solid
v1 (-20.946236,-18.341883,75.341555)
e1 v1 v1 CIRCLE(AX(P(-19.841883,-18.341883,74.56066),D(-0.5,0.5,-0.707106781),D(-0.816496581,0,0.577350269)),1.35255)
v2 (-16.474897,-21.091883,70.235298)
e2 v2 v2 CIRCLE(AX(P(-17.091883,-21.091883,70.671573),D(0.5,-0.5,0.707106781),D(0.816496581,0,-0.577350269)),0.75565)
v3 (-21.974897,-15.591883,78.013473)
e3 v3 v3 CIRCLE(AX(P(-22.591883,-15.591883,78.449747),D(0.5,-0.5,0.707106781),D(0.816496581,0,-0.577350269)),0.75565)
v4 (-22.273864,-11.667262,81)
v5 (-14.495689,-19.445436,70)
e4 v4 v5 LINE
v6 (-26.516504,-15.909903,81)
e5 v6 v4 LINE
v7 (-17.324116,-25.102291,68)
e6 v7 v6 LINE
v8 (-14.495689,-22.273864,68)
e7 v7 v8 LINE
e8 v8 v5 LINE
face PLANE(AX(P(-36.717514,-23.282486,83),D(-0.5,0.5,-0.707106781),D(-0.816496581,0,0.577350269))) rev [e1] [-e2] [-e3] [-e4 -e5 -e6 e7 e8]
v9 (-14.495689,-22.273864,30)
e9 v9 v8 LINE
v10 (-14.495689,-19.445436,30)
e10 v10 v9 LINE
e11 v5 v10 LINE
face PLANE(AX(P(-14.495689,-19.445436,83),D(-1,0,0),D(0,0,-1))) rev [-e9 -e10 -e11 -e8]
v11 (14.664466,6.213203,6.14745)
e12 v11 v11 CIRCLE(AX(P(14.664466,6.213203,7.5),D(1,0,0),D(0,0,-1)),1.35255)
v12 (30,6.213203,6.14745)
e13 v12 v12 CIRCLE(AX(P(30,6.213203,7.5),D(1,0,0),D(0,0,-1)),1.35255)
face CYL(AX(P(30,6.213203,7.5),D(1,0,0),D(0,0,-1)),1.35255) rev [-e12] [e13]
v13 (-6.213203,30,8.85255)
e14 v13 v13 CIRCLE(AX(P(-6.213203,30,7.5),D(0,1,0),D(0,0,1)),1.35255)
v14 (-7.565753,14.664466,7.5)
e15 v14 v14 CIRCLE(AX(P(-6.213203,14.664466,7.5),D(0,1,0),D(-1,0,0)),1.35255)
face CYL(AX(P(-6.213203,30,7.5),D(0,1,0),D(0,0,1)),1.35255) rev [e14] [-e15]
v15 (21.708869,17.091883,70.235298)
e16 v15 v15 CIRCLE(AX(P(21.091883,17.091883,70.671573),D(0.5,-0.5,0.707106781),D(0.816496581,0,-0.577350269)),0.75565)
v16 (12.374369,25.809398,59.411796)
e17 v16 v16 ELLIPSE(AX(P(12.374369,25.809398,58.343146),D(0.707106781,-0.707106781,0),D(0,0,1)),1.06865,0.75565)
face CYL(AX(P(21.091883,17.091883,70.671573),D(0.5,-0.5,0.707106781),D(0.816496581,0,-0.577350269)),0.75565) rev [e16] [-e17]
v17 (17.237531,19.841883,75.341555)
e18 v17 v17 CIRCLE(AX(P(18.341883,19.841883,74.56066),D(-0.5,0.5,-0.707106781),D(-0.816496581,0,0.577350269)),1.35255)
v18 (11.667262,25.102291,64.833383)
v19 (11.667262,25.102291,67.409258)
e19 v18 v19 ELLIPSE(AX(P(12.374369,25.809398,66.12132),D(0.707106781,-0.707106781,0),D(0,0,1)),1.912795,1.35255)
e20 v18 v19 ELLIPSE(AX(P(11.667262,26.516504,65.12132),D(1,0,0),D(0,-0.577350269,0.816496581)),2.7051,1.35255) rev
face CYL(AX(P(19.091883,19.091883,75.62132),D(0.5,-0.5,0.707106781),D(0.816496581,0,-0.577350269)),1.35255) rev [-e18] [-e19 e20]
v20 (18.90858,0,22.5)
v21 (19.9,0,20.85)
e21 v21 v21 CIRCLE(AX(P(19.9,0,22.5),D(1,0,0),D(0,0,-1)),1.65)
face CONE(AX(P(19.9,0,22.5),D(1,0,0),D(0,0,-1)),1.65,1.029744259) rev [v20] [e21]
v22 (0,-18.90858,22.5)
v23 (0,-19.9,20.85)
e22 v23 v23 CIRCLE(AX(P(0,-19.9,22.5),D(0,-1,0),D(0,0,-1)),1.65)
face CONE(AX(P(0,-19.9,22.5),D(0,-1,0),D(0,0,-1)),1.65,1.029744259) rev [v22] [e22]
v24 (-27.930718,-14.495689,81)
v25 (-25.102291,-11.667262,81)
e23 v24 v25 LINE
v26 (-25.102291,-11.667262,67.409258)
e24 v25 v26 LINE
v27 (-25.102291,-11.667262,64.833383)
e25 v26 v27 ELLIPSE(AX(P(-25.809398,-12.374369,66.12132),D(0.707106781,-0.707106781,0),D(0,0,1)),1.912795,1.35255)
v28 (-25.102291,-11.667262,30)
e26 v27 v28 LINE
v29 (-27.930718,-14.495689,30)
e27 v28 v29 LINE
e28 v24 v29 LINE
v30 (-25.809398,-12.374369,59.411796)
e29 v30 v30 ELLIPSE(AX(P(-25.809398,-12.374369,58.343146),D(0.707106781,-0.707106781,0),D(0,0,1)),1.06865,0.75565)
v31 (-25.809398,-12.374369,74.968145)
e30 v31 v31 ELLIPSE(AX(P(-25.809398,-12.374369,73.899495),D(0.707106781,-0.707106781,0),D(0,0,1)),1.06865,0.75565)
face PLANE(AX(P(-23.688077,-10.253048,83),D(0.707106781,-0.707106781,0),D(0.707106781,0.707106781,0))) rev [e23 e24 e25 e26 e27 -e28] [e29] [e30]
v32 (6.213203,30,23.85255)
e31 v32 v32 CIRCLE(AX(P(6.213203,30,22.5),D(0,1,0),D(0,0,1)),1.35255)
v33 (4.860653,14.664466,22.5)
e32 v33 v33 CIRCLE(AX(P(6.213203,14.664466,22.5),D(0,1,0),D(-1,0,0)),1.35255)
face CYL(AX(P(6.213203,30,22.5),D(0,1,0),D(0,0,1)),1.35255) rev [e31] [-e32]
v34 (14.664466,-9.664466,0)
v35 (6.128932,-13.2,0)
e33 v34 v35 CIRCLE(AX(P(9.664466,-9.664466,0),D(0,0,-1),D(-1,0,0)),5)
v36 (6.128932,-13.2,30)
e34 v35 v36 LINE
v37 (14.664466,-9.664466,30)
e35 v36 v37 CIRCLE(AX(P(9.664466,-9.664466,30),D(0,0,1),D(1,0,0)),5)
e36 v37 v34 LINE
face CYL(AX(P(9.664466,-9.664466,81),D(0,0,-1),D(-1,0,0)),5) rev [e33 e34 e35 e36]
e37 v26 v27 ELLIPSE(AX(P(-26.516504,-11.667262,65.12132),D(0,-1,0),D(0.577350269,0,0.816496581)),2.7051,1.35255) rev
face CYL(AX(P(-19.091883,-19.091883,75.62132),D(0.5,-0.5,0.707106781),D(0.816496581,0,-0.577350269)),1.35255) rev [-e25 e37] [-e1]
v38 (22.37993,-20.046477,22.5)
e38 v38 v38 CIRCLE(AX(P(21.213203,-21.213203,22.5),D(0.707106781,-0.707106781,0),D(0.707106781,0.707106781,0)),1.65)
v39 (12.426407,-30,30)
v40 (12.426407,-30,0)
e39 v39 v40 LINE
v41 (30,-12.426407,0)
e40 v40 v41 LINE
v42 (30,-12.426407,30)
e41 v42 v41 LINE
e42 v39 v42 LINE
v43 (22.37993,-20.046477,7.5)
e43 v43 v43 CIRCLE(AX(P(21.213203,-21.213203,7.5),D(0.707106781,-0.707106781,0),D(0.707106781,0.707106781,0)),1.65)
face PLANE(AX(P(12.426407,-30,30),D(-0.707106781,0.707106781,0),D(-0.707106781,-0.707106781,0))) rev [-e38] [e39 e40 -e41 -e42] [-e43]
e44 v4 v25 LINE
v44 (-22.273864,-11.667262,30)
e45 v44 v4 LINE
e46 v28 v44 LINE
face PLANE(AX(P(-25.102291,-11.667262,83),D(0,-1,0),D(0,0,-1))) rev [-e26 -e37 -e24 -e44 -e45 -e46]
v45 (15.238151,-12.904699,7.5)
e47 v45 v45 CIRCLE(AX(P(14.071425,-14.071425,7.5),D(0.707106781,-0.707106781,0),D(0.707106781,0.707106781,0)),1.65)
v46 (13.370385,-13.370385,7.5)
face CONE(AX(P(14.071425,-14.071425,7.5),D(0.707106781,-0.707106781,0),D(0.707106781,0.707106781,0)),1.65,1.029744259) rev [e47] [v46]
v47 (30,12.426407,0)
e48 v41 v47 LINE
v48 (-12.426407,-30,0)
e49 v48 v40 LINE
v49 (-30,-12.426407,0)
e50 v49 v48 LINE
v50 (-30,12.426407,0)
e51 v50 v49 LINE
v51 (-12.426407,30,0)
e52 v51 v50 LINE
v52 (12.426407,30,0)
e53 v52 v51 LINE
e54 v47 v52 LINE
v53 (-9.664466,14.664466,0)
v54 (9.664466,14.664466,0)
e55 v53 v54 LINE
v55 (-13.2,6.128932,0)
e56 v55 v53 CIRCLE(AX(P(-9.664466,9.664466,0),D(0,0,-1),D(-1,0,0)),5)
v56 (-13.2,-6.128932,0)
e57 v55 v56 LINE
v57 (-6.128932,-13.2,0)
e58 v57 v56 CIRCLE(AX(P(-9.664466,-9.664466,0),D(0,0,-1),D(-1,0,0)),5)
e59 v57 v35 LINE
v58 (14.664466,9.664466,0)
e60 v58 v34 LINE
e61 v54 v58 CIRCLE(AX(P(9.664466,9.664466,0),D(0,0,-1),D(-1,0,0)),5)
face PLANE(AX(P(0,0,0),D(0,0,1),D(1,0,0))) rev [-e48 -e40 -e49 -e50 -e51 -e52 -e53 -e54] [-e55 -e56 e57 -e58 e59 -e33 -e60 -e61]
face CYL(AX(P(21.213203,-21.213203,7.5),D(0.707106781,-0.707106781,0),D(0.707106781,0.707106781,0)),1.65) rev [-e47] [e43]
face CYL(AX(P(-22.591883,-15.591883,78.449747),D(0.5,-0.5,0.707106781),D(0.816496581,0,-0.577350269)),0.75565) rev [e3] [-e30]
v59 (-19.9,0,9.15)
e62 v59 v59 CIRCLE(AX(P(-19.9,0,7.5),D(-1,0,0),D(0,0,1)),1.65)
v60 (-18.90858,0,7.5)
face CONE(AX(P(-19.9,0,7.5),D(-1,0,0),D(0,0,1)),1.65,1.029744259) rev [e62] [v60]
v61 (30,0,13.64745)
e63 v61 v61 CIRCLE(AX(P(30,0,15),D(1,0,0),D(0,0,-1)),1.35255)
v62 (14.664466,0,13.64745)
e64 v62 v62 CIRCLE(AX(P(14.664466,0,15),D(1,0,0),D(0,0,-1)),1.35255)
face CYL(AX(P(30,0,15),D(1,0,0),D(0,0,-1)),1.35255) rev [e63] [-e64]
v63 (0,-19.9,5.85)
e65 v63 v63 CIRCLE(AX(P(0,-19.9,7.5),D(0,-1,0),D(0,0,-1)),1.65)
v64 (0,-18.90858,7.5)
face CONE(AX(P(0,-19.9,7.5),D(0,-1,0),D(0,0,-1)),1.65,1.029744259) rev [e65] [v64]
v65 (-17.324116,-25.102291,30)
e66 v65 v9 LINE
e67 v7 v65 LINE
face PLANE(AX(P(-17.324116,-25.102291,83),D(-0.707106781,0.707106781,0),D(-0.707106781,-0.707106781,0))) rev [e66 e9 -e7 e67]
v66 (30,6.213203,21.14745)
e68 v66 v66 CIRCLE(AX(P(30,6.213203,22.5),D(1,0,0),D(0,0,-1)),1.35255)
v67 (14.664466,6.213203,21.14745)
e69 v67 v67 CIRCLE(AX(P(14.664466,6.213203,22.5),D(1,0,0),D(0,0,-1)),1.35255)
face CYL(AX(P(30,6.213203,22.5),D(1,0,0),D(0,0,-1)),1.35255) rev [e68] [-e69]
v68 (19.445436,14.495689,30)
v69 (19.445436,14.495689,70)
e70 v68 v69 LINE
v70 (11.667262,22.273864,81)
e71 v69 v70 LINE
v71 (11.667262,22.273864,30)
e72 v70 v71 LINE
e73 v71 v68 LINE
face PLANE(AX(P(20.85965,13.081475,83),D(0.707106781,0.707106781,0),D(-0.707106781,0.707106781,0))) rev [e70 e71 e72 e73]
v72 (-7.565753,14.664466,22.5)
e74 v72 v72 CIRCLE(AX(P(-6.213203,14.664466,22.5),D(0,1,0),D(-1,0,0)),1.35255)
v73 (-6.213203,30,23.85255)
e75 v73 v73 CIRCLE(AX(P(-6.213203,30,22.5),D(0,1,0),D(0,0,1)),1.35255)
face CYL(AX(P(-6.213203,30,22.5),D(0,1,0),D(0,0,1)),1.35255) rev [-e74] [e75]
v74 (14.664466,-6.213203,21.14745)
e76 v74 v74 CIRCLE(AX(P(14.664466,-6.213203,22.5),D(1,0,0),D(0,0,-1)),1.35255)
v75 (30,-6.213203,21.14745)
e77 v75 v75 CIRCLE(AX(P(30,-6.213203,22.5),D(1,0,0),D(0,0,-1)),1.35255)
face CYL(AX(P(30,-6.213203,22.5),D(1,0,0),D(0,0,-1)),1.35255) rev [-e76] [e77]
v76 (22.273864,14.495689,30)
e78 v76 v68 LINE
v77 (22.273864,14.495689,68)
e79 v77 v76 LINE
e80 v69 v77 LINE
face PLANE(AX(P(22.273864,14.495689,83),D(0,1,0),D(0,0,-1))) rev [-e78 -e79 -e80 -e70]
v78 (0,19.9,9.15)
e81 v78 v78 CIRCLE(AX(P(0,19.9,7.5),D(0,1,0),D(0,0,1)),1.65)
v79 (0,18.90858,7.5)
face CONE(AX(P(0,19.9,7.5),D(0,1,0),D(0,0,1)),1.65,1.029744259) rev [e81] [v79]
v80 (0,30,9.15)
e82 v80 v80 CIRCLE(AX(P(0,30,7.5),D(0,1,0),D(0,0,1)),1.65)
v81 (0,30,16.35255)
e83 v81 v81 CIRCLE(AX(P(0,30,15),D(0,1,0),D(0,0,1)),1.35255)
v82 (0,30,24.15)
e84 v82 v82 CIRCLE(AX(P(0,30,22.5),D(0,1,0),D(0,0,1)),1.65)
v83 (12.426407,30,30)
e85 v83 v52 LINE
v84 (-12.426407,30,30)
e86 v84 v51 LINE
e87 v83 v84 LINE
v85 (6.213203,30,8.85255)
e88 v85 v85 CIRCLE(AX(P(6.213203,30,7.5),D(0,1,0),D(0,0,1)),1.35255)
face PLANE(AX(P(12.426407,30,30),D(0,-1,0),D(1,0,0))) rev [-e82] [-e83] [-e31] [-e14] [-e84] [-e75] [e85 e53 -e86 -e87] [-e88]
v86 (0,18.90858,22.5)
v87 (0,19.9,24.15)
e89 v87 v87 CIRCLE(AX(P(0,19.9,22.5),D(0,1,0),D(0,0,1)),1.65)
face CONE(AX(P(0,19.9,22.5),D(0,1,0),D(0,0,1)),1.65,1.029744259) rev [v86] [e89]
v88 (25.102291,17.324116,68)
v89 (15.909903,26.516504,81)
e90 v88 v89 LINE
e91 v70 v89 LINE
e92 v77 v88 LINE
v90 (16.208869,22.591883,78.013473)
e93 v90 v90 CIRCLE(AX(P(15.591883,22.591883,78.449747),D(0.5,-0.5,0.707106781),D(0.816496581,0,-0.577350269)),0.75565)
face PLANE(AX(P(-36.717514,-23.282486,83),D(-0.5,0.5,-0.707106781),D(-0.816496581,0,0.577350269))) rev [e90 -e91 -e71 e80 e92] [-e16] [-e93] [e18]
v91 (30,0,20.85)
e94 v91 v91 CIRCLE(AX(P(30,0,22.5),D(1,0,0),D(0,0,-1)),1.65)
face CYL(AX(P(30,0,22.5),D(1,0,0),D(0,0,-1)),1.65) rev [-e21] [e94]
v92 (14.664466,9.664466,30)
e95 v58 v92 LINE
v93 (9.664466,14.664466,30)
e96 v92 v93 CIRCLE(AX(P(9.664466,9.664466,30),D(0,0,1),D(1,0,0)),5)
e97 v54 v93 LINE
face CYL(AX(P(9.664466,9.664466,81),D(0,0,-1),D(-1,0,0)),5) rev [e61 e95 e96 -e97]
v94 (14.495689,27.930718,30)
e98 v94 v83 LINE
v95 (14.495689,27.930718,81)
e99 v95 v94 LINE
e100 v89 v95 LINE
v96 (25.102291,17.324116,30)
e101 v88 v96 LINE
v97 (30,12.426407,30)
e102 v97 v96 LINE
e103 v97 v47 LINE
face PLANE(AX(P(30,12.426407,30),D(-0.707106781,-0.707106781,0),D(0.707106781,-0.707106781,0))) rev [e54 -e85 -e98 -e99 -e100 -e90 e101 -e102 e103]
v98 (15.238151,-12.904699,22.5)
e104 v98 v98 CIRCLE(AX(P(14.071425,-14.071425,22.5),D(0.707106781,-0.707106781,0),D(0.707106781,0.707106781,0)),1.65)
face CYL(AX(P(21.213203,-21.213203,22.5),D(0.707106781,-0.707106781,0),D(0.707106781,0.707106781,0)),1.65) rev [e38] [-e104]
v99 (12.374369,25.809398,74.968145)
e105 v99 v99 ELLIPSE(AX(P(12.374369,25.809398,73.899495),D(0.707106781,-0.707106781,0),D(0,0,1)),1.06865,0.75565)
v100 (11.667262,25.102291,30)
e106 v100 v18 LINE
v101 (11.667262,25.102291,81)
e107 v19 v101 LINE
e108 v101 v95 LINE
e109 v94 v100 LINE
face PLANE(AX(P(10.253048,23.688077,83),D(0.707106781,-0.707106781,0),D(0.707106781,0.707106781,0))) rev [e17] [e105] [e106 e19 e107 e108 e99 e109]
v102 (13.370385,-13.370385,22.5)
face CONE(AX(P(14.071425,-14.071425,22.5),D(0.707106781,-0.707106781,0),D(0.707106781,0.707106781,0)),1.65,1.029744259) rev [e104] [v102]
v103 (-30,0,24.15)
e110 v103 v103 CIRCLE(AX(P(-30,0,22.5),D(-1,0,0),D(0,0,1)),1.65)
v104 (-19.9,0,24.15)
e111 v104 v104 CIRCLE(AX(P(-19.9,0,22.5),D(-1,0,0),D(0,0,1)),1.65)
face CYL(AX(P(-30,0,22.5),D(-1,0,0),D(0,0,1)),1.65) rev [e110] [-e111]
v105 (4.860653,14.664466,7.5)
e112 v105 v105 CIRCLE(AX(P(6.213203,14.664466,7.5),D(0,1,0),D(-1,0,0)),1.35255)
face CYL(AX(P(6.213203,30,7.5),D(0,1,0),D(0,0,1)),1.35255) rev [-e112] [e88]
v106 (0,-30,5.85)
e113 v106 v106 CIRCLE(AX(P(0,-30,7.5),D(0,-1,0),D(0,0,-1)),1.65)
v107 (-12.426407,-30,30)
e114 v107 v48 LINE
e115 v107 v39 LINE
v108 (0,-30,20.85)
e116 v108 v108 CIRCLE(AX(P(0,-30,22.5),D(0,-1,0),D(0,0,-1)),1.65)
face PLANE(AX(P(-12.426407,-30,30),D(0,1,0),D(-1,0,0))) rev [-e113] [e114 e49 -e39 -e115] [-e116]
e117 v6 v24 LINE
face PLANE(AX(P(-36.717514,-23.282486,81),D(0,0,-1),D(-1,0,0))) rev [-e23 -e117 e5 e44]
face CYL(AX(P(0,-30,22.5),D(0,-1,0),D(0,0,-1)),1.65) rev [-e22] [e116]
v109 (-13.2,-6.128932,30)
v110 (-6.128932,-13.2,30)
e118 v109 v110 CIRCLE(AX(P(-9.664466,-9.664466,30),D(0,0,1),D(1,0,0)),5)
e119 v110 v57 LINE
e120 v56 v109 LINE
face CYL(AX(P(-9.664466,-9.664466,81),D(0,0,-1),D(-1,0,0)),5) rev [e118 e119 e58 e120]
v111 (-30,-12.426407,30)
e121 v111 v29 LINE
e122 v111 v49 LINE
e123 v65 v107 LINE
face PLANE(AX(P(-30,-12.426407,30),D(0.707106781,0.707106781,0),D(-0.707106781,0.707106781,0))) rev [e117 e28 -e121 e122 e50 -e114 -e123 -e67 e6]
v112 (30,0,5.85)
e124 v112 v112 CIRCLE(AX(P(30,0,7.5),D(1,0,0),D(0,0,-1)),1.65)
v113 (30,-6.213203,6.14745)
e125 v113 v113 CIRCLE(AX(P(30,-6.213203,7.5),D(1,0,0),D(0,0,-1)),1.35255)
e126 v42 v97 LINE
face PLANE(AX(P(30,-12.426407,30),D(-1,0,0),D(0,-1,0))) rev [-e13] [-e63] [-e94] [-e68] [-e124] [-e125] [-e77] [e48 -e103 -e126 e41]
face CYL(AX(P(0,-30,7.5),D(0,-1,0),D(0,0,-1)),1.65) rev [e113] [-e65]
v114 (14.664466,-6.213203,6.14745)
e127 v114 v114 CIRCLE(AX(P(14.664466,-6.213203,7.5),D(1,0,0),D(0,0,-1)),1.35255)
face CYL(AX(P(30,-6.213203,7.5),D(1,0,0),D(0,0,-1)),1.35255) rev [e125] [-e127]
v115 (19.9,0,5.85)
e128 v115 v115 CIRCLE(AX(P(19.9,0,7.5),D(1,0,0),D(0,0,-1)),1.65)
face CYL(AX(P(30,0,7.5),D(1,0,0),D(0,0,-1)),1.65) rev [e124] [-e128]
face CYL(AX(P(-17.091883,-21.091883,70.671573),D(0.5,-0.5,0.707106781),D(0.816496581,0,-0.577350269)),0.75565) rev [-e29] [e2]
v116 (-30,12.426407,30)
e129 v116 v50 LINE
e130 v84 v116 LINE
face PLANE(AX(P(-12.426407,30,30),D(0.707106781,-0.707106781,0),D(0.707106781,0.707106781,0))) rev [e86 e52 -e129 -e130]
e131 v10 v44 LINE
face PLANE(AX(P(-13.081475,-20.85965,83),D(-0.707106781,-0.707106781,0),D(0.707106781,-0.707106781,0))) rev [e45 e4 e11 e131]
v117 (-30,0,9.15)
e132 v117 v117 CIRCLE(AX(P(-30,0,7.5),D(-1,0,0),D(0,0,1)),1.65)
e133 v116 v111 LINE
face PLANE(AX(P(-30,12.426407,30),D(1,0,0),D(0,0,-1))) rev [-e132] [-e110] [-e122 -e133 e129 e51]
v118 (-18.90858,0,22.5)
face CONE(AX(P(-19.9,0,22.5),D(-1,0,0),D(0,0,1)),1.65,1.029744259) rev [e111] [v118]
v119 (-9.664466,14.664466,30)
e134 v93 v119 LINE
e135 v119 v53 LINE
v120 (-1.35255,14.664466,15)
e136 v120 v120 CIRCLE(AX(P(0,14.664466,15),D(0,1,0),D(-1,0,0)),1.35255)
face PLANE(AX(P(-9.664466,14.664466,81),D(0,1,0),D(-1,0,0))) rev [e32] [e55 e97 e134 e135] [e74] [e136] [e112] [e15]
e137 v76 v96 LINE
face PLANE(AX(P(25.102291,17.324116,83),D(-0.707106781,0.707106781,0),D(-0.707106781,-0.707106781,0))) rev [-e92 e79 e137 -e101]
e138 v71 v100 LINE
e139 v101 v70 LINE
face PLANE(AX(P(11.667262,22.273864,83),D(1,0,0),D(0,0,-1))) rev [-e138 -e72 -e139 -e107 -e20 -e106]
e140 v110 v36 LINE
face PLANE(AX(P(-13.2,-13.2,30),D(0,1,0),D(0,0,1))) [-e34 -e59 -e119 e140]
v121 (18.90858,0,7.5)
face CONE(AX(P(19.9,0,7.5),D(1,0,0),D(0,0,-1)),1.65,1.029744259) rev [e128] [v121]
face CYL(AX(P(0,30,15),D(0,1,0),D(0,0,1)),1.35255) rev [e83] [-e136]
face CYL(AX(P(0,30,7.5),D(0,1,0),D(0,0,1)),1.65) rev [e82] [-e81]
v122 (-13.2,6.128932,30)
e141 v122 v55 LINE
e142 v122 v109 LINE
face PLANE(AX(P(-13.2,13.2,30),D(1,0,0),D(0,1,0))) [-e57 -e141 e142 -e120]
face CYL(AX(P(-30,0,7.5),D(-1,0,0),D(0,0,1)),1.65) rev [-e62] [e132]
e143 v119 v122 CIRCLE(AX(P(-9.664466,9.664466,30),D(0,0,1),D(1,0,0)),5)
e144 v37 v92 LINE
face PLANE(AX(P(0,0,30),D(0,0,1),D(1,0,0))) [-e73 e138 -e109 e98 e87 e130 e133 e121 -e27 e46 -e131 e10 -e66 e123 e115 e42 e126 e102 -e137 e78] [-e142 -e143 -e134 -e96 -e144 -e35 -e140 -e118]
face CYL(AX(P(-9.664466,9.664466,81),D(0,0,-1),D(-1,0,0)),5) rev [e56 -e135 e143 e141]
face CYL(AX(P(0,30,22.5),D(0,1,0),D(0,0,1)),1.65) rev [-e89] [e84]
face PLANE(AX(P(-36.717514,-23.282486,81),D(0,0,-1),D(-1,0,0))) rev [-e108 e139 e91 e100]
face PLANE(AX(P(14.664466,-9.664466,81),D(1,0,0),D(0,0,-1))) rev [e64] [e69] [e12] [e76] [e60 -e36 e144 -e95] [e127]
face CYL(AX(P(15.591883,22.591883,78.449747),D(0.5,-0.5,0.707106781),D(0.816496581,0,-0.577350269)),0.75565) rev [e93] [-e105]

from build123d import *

# Parameters (mm, degrees)
SKETCH1_W                 = 26.4
SKETCH1_H                 = 26.4
BOSS_EXTRUDE1_DEPTH       = 30
BOSS_EXTRUDE2_DEPTH       = 53
CUT_EXTRUDE1_DEPTH        = 111.157089705
F_6_32_TAPPED_HOLE1_D     = 2.7051
F_1_72_TAPPED_HOLE1_D     = 1.5113
CHAMFER1_SIZE             = 2
M4X0_7_TAPPED_HOLE1_D     = 3.3
M4X0_7_TAPPED_HOLE1_DEPTH = 10.1
M4X0_7_TAPPED_HOLE1_TIP   = 0.991420021
M4X0_7_TAPPED_HOLE2_D     = 3.3
M4X0_7_TAPPED_HOLE2_DEPTH = 10.1
M4X0_7_TAPPED_HOLE2_TIP   = 0.991420021
M4X0_7_TAPPED_HOLE3_D     = 3.3
M4X0_7_TAPPED_HOLE3_DEPTH = 10.1
M4X0_7_TAPPED_HOLE3_TIP   = 0.991420021
CUT_EXTRUDE2_DEPTH        = 111.157089705
M4X0_7_TAPPED_HOLE4_D     = 3.3
M4X0_7_TAPPED_HOLE4_DEPTH = 10.1
M4X0_7_TAPPED_HOLE4_TIP   = 0.991420021
SKETCH24_R                = 5
CUT_EXTRUDE3_DEPTH        = 92.438503925
SKETCH25_W                = 19.328932188
SKETCH25_H                = 1.464466094
SKETCH25_W_2              = 1.464466094
SKETCH25_H_2              = 19.328932188
CUT_EXTRUDE4_DEPTH        = 92.438503925
F_6_32_TAPPED_HOLE2_D     = 2.7051
F_6_32_TAPPED_HOLE2_DEPTH = 15.335533906
F_6_32_TAPPED_HOLE3_D     = 2.7051
F_6_32_TAPPED_HOLE3_DEPTH = 15.335533906
M4X0_7_TAPPED_HOLE6_D     = 3.3
M4X0_7_TAPPED_HOLE6_DEPTH = 10.1
M4X0_7_TAPPED_HOLE6_TIP   = 0.991420021


with BuildPart() as part:
    # Sketch1 → Boss-Extrude1 (new body)
    with BuildSketch(Plane.XY):
        Polygon((-12.426406871, -30), (12.426406871, -30), (30, -12.426406871), (30, 12.426406871), (12.426406871, 30), (-12.426406871, 30), (-30, 12.426406871), (-30, -12.426406871), align=None)
        Rectangle(SKETCH1_W, SKETCH1_H, mode=Mode.SUBTRACT)
    extrude(amount=BOSS_EXTRUDE1_DEPTH)

    # Sketch2 → Boss-Extrude2 (add)
    with BuildSketch(Plane.XY.offset(30)):
        Polygon((14.495689014, 27.930717857), (25.102290732, 17.324116139), (20.859650045, 13.081475452), (10.253048327, 23.68807717), align=None)
        Polygon((-27.930717857, -14.495689014), (-17.324116139, -25.102290732), (-13.081475452, -20.859650045), (-23.68807717, -10.253048327), align=None)
    extrude(amount=BOSS_EXTRUDE2_DEPTH)

    # Sketch3 → Cut-Extrude1 (cut, through all)
    with BuildSketch(Plane(origin=(21.213203436, 21.213203436, 0), x_dir=(0, 0, -1), z_dir=(0.7071067811865475, 0.7071067811865477, 0))):
        Polygon((-83, 9.5), (-83, -5.5), (-68, -5.5), align=None)
    extrude(amount=-CUT_EXTRUDE1_DEPTH, mode=Mode.SUBTRACT)

    # #6-32 Tapped Hole1 (through all)
    with Locations(Plane(origin=(26.736174209, -26.736174209, 37.810660172), x_dir=(0.8660254037844379, 0.2886751345948145, -0.40824829046386363), z_dir=(0.5000000000000013, -0.5000000000000009, 0.7071067811865459))):
        with Locations((-8.826867068, 59.248446925), (-52.917682438, 28.071532389)):
            Hole(F_6_32_TAPPED_HOLE1_D / 2)

    # #1-72 Tapped Hole1 (through all)
    with Locations(Plane(origin=(25.986174209, -25.986174209, 36.75), x_dir=(0.8660254037844379, 0.2886751345948144, -0.40824829046386346), z_dir=(0.5000000000000012, -0.5000000000000009, 0.707106781186546))):
        with Locations((-12.002293548, 63.73917812), (-5.651440587, 54.75771573), (-56.093108918, 32.562263584), (-49.742255957, 23.580801194)):
            Hole(F_1_72_TAPPED_HOLE1_D / 2)

    # Chamfer1
    # the kernel refuses this chamfer: 2 mm, written as the material it takes off along each edge
    with BuildSketch(Plane(origin=(10.253048327, 23.68807717, 30), x_dir=(0.6873969152646597, 0.7262819568766873, 0), z_dir=(0, 0, 1))) as chamfer1_piece_1:
        Polygon((CHAMFER1_SIZE * 0.999621916911, -CHAMFER1_SIZE * 0.0274958766106), (-CHAMFER1_SIZE * 0.0274958766106, -CHAMFER1_SIZE * 0.999621916911), (0, 0), align=None)
    extrude(amount=58.143365976, mode=Mode.SUBTRACT)
    with BuildSketch(Plane(origin=(20.859650045, 13.081475452, 30), x_dir=(-0.7262819568766877, 0.6873969152646593, 0), z_dir=(0, 0, 1)), Plane(origin=(-13.081475452, -20.859650045, 30), x_dir=(-0.6873969152646596, -0.7262819568766873, 0), z_dir=(0, 0, 1))) as chamfer1_piece_2:
        Polygon((CHAMFER1_SIZE * 0.999621916911, -CHAMFER1_SIZE * 0.0274958766106), (-CHAMFER1_SIZE * 0.0274958766106, -CHAMFER1_SIZE * 0.999621916911), (0, 0), align=None)
    extrude(amount=43.143365976, mode=Mode.SUBTRACT)
    with BuildSketch(Plane(origin=(-23.68807717, -10.253048327, 30), x_dir=(-0.7262819568766861, -0.6873969152646611, 0), z_dir=(0, 0, 1))) as chamfer1_piece_3:
        Polygon((CHAMFER1_SIZE * 0.999621916911, CHAMFER1_SIZE * 0.0274958766106), (-CHAMFER1_SIZE * 0.0274958766106, CHAMFER1_SIZE * 0.999621916911), (0, 0), align=None)
    extrude(amount=58.143365976, mode=Mode.SUBTRACT)

    # M4x0.7 Tapped Hole1
    with Locations(Plane.ZY.offset(30)):
        with Locations((7.5, 0), (22.5, 0)):
            Hole(M4X0_7_TAPPED_HOLE1_D / 2, depth=M4X0_7_TAPPED_HOLE1_DEPTH)
            with Locations((0, 0, -(M4X0_7_TAPPED_HOLE1_DEPTH + M4X0_7_TAPPED_HOLE1_TIP / 2))):  # 118° drill point
                Cone(0, M4X0_7_TAPPED_HOLE1_D / 2, M4X0_7_TAPPED_HOLE1_TIP, mode=Mode.SUBTRACT)

    # M4x0.7 Tapped Hole2
    with Locations(Plane(origin=(0, -30, 0), x_dir=(-1, 0, 0), z_dir=(0, -1, 0))):
        with Locations((0, -22.5), (0, -7.5)):
            Hole(M4X0_7_TAPPED_HOLE2_D / 2, depth=M4X0_7_TAPPED_HOLE2_DEPTH)
            with Locations((0, 0, -(M4X0_7_TAPPED_HOLE2_DEPTH + M4X0_7_TAPPED_HOLE2_TIP / 2))):  # 118° drill point
                Cone(0, M4X0_7_TAPPED_HOLE2_D / 2, M4X0_7_TAPPED_HOLE2_TIP, mode=Mode.SUBTRACT)

    # M4x0.7 Tapped Hole3
    with Locations(Plane(origin=(21.213203436, -21.213203436, 0), x_dir=(0, 0, -1), z_dir=(0.7071067811865476, -0.7071067811865475, 0))):
        with Locations((-22.5, 0), (-7.5, 0)):
            Hole(M4X0_7_TAPPED_HOLE3_D / 2, depth=M4X0_7_TAPPED_HOLE3_DEPTH)
            with Locations((0, 0, -(M4X0_7_TAPPED_HOLE3_DEPTH + M4X0_7_TAPPED_HOLE3_TIP / 2))):  # 118° drill point
                Cone(0, M4X0_7_TAPPED_HOLE3_D / 2, M4X0_7_TAPPED_HOLE3_TIP, mode=Mode.SUBTRACT)

    # Sketch20 → Cut-Extrude2 (cut, through all)
    with BuildSketch(Plane(origin=(21.213203436, 21.213203436, 0), x_dir=(0, 0, -1), z_dir=(0.7071067811865475, 0.7071067811865477, 0))):
        Polygon((-83, 9.5), (-81, 9.5), (-81, 7.5), align=None)
    extrude(amount=-CUT_EXTRUDE2_DEPTH, mode=Mode.SUBTRACT)

    # M4x0.7 Tapped Hole4
    with Locations(Plane(origin=(0, 30, 0), x_dir=(1, 0, 0), z_dir=(0, 1, 0))):
        with Locations((0, -7.5), (0, -22.5)):
            Hole(M4X0_7_TAPPED_HOLE4_D / 2, depth=M4X0_7_TAPPED_HOLE4_DEPTH)
            with Locations((0, 0, -(M4X0_7_TAPPED_HOLE4_DEPTH + M4X0_7_TAPPED_HOLE4_TIP / 2))):  # 118° drill point
                Cone(0, M4X0_7_TAPPED_HOLE4_D / 2, M4X0_7_TAPPED_HOLE4_TIP, mode=Mode.SUBTRACT)

    # Sketch24 → Cut-Extrude3 (cut, through all)
    with BuildSketch(Plane(origin=(0, 0, 0), x_dir=(-1, 0, 0), z_dir=(0, 0, -1))):
        with Locations((-9.664466094, 9.664466094)):
            Circle(SKETCH24_R)
        with Locations((9.664466094, 9.664466094)):
            Circle(SKETCH24_R)
        with Locations((9.664466094, -9.664466094)):
            Circle(SKETCH24_R)
        with Locations((-9.664466094, -9.664466094)):
            Circle(SKETCH24_R)
    extrude(amount=-CUT_EXTRUDE3_DEPTH, mode=Mode.SUBTRACT)

    # Sketch25 → Cut-Extrude4 (cut, through all)
    with BuildSketch(Plane(origin=(0, 0, 0), x_dir=(-1, 0, 0), z_dir=(0, 0, -1))):
        with Locations((0, 13.932233047)):
            Rectangle(SKETCH25_W, SKETCH25_H)
        with Locations((-13.932233047, 0)):
            Rectangle(SKETCH25_W_2, SKETCH25_H_2)
    extrude(amount=-CUT_EXTRUDE4_DEPTH, mode=Mode.SUBTRACT)

    # #6-32 Tapped Hole2
    with Locations(Plane(origin=(0, 30, 0), x_dir=(1, 0, 0), z_dir=(0, 1, 0))):
        with Locations((0, -15), (-6.213203436, -7.5), (6.213203436, -7.5), (-6.213203436, -22.5), (6.213203436, -22.5)):
            Hole(F_6_32_TAPPED_HOLE2_D / 2, depth=F_6_32_TAPPED_HOLE2_DEPTH)

    # #6-32 Tapped Hole3
    with Locations(Plane(origin=(30, 0, 0), x_dir=(0, 0, -1), z_dir=(1, 0, 0))):
        with Locations((-15, 0), (-7.5, 6.213203436), (-22.5, -6.213203436), (-22.5, 6.213203436), (-7.5, -6.213203436)):
            Hole(F_6_32_TAPPED_HOLE3_D / 2, depth=F_6_32_TAPPED_HOLE3_DEPTH)

    # M4x0.7 Tapped Hole6
    with Locations(Plane(origin=(30, 0, 0), x_dir=(0, 0, -1), z_dir=(1, 0, 0))):
        with Locations((-22.5, 0), (-7.5, 0)):
            Hole(M4X0_7_TAPPED_HOLE6_D / 2, depth=M4X0_7_TAPPED_HOLE6_DEPTH)
            with Locations((0, 0, -(M4X0_7_TAPPED_HOLE6_DEPTH + M4X0_7_TAPPED_HOLE6_TIP / 2))):  # 118° drill point
                Cone(0, M4X0_7_TAPPED_HOLE6_D / 2, M4X0_7_TAPPED_HOLE6_TIP, mode=Mode.SUBTRACT)


solid = part.part
